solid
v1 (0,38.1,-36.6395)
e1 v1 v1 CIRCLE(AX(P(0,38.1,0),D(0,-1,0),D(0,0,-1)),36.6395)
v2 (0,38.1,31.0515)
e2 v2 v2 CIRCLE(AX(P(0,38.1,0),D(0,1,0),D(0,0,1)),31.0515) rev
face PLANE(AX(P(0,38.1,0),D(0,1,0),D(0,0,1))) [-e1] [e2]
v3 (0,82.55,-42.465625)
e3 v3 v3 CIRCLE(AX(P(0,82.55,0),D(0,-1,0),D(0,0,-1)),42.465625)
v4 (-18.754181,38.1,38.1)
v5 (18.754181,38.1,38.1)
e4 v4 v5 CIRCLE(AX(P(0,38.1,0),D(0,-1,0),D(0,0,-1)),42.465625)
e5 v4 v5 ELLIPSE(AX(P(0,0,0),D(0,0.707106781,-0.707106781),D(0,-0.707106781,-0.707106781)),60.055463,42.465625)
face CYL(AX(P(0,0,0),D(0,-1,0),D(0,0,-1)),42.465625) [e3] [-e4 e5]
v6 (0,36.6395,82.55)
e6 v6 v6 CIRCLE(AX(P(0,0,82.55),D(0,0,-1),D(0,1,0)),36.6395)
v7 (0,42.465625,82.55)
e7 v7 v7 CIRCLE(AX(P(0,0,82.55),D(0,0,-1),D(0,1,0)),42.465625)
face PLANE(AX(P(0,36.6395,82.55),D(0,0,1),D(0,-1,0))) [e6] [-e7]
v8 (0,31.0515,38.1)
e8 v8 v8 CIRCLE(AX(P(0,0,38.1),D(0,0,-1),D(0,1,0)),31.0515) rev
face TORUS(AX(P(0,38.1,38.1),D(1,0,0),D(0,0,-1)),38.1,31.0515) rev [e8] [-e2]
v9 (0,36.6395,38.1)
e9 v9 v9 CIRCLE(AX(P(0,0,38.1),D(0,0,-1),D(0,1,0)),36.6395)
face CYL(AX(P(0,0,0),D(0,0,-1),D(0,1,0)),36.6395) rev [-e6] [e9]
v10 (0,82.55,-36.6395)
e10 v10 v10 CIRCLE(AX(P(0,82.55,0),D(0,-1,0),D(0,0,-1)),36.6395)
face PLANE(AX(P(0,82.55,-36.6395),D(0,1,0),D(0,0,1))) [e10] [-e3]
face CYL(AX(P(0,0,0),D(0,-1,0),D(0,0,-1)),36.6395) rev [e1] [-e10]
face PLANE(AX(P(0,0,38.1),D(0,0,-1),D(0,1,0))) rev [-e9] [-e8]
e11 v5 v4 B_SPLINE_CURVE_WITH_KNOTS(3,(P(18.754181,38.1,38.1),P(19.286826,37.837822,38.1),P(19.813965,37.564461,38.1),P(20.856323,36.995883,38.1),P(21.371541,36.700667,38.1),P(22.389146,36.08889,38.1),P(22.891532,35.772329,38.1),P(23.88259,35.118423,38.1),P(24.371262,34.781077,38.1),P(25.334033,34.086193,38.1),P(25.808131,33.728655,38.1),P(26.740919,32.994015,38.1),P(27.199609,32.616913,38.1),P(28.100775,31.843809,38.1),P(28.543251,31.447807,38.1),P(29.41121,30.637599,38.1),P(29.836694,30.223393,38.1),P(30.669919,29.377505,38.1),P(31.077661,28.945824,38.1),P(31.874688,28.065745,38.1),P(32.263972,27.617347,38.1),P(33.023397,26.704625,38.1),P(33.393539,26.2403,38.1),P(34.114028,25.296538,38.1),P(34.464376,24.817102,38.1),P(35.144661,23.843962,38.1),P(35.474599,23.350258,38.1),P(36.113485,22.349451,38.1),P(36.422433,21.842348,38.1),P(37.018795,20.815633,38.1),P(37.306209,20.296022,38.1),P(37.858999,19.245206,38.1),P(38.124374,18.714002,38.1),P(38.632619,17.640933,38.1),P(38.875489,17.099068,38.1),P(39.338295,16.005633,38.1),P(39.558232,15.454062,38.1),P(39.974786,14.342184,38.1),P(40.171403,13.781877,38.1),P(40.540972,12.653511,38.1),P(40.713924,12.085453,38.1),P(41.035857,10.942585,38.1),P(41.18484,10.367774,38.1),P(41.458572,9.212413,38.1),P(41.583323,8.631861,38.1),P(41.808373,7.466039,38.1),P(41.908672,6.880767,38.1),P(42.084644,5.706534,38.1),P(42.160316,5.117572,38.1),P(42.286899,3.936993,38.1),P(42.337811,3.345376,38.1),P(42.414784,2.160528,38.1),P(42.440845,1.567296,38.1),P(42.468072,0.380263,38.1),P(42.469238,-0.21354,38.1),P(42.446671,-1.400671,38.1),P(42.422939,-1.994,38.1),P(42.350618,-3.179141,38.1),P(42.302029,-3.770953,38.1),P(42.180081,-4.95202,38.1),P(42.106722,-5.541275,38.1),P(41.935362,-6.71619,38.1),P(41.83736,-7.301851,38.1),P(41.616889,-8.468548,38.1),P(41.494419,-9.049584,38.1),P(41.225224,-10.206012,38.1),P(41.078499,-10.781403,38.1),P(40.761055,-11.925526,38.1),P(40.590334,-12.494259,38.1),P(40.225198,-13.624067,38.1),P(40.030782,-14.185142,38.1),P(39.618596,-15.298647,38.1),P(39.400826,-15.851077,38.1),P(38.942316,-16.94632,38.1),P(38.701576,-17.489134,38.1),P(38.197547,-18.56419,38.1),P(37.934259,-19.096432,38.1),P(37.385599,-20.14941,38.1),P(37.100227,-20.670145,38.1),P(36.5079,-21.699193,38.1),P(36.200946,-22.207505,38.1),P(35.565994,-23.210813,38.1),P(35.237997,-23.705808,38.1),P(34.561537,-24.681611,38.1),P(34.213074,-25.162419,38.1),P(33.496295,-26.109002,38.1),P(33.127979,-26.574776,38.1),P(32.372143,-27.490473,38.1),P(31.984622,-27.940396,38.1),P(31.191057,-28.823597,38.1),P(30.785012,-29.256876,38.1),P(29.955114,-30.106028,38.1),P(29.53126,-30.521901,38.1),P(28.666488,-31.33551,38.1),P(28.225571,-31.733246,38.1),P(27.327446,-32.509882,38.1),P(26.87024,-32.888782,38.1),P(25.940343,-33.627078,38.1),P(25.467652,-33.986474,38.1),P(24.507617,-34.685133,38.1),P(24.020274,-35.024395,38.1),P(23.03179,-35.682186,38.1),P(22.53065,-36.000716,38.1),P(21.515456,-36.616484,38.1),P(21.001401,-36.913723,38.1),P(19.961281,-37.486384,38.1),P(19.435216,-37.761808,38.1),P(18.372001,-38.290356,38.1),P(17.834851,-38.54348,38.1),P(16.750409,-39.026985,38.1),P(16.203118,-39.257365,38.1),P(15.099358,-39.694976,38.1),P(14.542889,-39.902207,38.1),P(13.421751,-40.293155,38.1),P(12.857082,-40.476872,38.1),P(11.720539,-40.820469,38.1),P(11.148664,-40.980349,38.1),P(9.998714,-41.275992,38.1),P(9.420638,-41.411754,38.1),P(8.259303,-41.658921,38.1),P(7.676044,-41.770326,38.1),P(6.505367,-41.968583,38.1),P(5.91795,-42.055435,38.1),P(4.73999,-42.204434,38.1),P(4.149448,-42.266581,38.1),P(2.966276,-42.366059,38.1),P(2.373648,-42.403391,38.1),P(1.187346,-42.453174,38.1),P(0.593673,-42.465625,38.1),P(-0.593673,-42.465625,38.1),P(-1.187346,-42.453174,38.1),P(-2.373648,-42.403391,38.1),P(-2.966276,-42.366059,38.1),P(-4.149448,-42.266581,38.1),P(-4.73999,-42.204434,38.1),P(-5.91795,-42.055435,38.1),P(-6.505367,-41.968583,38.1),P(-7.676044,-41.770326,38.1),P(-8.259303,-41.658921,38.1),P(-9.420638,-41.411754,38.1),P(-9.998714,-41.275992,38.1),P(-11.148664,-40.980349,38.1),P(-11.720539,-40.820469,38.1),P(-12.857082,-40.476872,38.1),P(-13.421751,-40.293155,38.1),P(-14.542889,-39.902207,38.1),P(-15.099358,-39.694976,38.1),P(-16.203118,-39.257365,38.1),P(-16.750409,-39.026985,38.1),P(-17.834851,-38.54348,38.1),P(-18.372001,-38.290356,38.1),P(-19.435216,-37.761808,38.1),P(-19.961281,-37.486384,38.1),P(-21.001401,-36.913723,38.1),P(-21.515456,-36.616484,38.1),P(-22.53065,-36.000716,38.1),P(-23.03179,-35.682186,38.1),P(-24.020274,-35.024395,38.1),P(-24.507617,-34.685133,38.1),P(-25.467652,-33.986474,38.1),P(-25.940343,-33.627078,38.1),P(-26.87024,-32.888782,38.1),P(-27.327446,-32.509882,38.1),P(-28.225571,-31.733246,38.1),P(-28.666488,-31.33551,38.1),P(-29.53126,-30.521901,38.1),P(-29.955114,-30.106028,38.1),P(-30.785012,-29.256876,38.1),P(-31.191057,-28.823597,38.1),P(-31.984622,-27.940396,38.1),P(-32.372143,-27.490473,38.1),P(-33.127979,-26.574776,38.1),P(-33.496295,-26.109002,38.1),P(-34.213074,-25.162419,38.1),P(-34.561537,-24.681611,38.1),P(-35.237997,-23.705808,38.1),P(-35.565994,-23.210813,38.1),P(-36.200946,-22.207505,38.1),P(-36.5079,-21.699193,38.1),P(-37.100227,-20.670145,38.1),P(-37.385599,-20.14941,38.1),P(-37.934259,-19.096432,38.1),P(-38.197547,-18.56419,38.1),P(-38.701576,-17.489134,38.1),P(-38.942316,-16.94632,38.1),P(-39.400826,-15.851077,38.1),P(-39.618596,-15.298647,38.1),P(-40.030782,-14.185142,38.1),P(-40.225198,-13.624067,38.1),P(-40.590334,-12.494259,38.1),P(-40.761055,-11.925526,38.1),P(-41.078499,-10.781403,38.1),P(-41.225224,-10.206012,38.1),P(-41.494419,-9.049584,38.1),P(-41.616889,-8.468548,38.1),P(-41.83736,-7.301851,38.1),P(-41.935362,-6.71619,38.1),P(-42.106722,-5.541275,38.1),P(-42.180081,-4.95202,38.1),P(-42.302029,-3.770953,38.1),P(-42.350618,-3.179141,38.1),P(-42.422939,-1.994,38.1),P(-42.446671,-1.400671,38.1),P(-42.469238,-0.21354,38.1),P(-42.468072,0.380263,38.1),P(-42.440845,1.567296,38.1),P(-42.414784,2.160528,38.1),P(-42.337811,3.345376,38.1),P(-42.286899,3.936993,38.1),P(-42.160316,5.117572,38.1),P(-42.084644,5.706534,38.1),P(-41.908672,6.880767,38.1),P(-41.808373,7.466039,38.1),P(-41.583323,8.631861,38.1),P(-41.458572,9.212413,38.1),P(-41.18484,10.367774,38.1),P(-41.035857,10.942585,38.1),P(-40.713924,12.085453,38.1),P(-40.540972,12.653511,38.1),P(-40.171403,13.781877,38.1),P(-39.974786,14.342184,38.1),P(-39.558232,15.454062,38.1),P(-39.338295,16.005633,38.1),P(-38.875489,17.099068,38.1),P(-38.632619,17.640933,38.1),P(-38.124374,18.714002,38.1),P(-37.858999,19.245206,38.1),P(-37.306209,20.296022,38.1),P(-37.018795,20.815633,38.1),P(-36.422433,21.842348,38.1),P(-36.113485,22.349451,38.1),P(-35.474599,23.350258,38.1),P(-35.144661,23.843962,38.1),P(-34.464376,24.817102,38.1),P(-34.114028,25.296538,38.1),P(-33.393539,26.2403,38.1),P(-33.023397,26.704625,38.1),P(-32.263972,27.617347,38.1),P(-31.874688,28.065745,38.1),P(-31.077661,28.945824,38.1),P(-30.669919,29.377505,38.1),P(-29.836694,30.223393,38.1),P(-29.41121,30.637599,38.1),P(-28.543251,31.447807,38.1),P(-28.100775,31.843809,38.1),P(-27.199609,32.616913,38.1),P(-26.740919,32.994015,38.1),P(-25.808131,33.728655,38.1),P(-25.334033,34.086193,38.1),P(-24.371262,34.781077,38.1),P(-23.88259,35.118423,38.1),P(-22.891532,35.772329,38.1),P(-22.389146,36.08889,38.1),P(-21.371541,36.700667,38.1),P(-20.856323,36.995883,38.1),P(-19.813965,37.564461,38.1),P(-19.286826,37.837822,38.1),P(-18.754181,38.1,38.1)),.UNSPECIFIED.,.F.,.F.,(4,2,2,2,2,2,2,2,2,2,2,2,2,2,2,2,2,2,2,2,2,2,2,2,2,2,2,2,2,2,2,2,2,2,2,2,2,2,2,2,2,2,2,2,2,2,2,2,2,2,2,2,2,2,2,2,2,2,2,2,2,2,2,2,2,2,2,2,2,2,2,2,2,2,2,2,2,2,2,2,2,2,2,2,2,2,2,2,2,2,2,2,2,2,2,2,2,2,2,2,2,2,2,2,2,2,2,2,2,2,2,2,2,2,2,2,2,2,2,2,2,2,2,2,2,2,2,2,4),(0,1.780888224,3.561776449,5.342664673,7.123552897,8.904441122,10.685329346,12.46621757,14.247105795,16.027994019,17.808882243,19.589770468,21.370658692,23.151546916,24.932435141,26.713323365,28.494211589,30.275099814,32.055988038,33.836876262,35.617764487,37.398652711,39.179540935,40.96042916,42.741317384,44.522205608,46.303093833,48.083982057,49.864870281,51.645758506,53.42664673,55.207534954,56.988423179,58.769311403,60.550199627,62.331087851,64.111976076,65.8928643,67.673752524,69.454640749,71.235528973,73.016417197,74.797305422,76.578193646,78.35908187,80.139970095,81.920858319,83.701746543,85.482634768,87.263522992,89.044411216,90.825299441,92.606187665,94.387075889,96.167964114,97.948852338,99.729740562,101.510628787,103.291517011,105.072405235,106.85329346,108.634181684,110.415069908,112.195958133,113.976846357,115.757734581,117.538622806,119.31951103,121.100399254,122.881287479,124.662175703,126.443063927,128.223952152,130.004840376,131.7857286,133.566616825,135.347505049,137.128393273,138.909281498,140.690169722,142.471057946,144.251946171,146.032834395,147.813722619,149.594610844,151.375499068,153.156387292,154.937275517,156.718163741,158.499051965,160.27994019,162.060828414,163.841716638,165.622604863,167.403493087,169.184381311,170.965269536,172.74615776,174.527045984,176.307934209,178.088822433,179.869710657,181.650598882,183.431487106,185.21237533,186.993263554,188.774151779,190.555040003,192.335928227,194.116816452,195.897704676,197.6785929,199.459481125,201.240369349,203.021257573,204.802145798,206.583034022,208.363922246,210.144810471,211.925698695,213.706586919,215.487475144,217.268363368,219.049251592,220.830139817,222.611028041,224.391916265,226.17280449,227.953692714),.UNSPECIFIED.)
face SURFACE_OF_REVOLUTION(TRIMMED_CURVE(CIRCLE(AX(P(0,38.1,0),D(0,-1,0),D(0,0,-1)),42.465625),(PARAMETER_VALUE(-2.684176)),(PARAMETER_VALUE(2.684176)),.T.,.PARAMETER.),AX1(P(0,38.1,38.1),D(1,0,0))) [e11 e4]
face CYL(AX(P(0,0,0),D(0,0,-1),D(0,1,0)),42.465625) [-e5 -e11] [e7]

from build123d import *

# Parameters (mm, degrees)
SKETCH2_W        = 44.45
SKETCH2_H        = 5.826125
SKETCH3_W        = 5.826125
SKETCH3_H        = 44.45
SWEEP1_OUTLINE_R = 31.0515
SWEEP1_ANGLE     = 90


# Read off the part's stored shape, not the designer's step: Sweep1
with BuildPart() as part:
    # Sketch2 → Revolve1 (revolve)
    with BuildSketch(Plane(origin=(0, 0, 0), x_dir=(0, 0, -1), z_dir=(1, 0, 0))):
        with Locations((-60.325, 39.5525625)):
            Rectangle(SKETCH2_W, SKETCH2_H)
    revolve(axis=Axis((0, 0, 0), (0, 0, 1)))

    # Sketch3 → Revolve2 (revolve)
    with BuildSketch(Plane(origin=(0, 0, 0), x_dir=(0, 0, -1), z_dir=(1, 0, 0))):
        with Locations((39.5525625, 60.325)):
            Rectangle(SKETCH3_W, SKETCH3_H)
    revolve(axis=Axis((0, 0, 0), (0, 1, 0)))

    # Sweep1 outline → Sweep1 (revolve)
    with BuildSketch(Plane(origin=(0, 38.1, 38.1), x_dir=(0, -1, 0), z_dir=(0, 0, 1))):
        with BuildLine():
            Line((0, 18.754181044), (0, -18.754181044))
            add(Edge.make_bspline(
                [(0, -18.754181044), (3.595121657, -26.057839615), (9.397449748, -33.407976072), (17.825883125, -39.559399853), (28.204619336, -42.465624968), (44.310790561, -42.46562502), (50.403307493, -41.329592494), (55.932569526, -39.150372881), (60.686650624, -36.321869277), (69.83985958, -28.979313764), (74.693549795, -23.427727825), (78.605101985, -16.344282836), (82.51560631, -3.11e-07), (78.605102252, 16.34428235), (74.693550018, 23.42772757), (69.839859698, 28.979313669), (60.686650629, 36.321869273), (55.932569539, 39.150372874), (50.403307515, 41.329592485), (44.310790594, 42.465625014), (28.204619371, 42.465624978), (17.825883146, 39.559399869), (9.397449758, 33.407976085), (3.59512166, 26.057839621), (0, 18.754181044)],
                knots=[3.599009571, 3.599009571, 3.599009571, 3.599009571, 3.599009571, 3.599009571, 4.698420057, 4.698420057, 4.698420057, 4.698420057, 5.388460062, 5.388460062, 5.388460062, 5.388460062, 6.283185297, 6.283185297, 6.283185297, 7.177910553, 7.177910553, 7.177910553, 7.177910553, 7.867950556, 7.867950556, 7.867950556, 7.867950556, 8.967361044, 8.967361044, 8.967361044, 8.967361044, 8.967361044, 8.967361044], degree=5, weights=[1, 1, 0.995343828, 0.991763785, 1, 1, 0.999483219, 0.999983206, 1, 1, 0.998916664, 0.997304294, 1.002695707, 0.997304293, 0.998916664, 1, 1, 0.999983206, 0.999483219, 1, 1, 0.991763785, 0.995343828, 1, 1]))
        make_face()
        with Locations((38.1, 0)):
            Circle(SWEEP1_OUTLINE_R, mode=Mode.SUBTRACT)
    revolve(axis=Axis((0, 38.1, 38.1), (1, 0, 0)), revolution_arc=SWEEP1_ANGLE)


solid = part.part
